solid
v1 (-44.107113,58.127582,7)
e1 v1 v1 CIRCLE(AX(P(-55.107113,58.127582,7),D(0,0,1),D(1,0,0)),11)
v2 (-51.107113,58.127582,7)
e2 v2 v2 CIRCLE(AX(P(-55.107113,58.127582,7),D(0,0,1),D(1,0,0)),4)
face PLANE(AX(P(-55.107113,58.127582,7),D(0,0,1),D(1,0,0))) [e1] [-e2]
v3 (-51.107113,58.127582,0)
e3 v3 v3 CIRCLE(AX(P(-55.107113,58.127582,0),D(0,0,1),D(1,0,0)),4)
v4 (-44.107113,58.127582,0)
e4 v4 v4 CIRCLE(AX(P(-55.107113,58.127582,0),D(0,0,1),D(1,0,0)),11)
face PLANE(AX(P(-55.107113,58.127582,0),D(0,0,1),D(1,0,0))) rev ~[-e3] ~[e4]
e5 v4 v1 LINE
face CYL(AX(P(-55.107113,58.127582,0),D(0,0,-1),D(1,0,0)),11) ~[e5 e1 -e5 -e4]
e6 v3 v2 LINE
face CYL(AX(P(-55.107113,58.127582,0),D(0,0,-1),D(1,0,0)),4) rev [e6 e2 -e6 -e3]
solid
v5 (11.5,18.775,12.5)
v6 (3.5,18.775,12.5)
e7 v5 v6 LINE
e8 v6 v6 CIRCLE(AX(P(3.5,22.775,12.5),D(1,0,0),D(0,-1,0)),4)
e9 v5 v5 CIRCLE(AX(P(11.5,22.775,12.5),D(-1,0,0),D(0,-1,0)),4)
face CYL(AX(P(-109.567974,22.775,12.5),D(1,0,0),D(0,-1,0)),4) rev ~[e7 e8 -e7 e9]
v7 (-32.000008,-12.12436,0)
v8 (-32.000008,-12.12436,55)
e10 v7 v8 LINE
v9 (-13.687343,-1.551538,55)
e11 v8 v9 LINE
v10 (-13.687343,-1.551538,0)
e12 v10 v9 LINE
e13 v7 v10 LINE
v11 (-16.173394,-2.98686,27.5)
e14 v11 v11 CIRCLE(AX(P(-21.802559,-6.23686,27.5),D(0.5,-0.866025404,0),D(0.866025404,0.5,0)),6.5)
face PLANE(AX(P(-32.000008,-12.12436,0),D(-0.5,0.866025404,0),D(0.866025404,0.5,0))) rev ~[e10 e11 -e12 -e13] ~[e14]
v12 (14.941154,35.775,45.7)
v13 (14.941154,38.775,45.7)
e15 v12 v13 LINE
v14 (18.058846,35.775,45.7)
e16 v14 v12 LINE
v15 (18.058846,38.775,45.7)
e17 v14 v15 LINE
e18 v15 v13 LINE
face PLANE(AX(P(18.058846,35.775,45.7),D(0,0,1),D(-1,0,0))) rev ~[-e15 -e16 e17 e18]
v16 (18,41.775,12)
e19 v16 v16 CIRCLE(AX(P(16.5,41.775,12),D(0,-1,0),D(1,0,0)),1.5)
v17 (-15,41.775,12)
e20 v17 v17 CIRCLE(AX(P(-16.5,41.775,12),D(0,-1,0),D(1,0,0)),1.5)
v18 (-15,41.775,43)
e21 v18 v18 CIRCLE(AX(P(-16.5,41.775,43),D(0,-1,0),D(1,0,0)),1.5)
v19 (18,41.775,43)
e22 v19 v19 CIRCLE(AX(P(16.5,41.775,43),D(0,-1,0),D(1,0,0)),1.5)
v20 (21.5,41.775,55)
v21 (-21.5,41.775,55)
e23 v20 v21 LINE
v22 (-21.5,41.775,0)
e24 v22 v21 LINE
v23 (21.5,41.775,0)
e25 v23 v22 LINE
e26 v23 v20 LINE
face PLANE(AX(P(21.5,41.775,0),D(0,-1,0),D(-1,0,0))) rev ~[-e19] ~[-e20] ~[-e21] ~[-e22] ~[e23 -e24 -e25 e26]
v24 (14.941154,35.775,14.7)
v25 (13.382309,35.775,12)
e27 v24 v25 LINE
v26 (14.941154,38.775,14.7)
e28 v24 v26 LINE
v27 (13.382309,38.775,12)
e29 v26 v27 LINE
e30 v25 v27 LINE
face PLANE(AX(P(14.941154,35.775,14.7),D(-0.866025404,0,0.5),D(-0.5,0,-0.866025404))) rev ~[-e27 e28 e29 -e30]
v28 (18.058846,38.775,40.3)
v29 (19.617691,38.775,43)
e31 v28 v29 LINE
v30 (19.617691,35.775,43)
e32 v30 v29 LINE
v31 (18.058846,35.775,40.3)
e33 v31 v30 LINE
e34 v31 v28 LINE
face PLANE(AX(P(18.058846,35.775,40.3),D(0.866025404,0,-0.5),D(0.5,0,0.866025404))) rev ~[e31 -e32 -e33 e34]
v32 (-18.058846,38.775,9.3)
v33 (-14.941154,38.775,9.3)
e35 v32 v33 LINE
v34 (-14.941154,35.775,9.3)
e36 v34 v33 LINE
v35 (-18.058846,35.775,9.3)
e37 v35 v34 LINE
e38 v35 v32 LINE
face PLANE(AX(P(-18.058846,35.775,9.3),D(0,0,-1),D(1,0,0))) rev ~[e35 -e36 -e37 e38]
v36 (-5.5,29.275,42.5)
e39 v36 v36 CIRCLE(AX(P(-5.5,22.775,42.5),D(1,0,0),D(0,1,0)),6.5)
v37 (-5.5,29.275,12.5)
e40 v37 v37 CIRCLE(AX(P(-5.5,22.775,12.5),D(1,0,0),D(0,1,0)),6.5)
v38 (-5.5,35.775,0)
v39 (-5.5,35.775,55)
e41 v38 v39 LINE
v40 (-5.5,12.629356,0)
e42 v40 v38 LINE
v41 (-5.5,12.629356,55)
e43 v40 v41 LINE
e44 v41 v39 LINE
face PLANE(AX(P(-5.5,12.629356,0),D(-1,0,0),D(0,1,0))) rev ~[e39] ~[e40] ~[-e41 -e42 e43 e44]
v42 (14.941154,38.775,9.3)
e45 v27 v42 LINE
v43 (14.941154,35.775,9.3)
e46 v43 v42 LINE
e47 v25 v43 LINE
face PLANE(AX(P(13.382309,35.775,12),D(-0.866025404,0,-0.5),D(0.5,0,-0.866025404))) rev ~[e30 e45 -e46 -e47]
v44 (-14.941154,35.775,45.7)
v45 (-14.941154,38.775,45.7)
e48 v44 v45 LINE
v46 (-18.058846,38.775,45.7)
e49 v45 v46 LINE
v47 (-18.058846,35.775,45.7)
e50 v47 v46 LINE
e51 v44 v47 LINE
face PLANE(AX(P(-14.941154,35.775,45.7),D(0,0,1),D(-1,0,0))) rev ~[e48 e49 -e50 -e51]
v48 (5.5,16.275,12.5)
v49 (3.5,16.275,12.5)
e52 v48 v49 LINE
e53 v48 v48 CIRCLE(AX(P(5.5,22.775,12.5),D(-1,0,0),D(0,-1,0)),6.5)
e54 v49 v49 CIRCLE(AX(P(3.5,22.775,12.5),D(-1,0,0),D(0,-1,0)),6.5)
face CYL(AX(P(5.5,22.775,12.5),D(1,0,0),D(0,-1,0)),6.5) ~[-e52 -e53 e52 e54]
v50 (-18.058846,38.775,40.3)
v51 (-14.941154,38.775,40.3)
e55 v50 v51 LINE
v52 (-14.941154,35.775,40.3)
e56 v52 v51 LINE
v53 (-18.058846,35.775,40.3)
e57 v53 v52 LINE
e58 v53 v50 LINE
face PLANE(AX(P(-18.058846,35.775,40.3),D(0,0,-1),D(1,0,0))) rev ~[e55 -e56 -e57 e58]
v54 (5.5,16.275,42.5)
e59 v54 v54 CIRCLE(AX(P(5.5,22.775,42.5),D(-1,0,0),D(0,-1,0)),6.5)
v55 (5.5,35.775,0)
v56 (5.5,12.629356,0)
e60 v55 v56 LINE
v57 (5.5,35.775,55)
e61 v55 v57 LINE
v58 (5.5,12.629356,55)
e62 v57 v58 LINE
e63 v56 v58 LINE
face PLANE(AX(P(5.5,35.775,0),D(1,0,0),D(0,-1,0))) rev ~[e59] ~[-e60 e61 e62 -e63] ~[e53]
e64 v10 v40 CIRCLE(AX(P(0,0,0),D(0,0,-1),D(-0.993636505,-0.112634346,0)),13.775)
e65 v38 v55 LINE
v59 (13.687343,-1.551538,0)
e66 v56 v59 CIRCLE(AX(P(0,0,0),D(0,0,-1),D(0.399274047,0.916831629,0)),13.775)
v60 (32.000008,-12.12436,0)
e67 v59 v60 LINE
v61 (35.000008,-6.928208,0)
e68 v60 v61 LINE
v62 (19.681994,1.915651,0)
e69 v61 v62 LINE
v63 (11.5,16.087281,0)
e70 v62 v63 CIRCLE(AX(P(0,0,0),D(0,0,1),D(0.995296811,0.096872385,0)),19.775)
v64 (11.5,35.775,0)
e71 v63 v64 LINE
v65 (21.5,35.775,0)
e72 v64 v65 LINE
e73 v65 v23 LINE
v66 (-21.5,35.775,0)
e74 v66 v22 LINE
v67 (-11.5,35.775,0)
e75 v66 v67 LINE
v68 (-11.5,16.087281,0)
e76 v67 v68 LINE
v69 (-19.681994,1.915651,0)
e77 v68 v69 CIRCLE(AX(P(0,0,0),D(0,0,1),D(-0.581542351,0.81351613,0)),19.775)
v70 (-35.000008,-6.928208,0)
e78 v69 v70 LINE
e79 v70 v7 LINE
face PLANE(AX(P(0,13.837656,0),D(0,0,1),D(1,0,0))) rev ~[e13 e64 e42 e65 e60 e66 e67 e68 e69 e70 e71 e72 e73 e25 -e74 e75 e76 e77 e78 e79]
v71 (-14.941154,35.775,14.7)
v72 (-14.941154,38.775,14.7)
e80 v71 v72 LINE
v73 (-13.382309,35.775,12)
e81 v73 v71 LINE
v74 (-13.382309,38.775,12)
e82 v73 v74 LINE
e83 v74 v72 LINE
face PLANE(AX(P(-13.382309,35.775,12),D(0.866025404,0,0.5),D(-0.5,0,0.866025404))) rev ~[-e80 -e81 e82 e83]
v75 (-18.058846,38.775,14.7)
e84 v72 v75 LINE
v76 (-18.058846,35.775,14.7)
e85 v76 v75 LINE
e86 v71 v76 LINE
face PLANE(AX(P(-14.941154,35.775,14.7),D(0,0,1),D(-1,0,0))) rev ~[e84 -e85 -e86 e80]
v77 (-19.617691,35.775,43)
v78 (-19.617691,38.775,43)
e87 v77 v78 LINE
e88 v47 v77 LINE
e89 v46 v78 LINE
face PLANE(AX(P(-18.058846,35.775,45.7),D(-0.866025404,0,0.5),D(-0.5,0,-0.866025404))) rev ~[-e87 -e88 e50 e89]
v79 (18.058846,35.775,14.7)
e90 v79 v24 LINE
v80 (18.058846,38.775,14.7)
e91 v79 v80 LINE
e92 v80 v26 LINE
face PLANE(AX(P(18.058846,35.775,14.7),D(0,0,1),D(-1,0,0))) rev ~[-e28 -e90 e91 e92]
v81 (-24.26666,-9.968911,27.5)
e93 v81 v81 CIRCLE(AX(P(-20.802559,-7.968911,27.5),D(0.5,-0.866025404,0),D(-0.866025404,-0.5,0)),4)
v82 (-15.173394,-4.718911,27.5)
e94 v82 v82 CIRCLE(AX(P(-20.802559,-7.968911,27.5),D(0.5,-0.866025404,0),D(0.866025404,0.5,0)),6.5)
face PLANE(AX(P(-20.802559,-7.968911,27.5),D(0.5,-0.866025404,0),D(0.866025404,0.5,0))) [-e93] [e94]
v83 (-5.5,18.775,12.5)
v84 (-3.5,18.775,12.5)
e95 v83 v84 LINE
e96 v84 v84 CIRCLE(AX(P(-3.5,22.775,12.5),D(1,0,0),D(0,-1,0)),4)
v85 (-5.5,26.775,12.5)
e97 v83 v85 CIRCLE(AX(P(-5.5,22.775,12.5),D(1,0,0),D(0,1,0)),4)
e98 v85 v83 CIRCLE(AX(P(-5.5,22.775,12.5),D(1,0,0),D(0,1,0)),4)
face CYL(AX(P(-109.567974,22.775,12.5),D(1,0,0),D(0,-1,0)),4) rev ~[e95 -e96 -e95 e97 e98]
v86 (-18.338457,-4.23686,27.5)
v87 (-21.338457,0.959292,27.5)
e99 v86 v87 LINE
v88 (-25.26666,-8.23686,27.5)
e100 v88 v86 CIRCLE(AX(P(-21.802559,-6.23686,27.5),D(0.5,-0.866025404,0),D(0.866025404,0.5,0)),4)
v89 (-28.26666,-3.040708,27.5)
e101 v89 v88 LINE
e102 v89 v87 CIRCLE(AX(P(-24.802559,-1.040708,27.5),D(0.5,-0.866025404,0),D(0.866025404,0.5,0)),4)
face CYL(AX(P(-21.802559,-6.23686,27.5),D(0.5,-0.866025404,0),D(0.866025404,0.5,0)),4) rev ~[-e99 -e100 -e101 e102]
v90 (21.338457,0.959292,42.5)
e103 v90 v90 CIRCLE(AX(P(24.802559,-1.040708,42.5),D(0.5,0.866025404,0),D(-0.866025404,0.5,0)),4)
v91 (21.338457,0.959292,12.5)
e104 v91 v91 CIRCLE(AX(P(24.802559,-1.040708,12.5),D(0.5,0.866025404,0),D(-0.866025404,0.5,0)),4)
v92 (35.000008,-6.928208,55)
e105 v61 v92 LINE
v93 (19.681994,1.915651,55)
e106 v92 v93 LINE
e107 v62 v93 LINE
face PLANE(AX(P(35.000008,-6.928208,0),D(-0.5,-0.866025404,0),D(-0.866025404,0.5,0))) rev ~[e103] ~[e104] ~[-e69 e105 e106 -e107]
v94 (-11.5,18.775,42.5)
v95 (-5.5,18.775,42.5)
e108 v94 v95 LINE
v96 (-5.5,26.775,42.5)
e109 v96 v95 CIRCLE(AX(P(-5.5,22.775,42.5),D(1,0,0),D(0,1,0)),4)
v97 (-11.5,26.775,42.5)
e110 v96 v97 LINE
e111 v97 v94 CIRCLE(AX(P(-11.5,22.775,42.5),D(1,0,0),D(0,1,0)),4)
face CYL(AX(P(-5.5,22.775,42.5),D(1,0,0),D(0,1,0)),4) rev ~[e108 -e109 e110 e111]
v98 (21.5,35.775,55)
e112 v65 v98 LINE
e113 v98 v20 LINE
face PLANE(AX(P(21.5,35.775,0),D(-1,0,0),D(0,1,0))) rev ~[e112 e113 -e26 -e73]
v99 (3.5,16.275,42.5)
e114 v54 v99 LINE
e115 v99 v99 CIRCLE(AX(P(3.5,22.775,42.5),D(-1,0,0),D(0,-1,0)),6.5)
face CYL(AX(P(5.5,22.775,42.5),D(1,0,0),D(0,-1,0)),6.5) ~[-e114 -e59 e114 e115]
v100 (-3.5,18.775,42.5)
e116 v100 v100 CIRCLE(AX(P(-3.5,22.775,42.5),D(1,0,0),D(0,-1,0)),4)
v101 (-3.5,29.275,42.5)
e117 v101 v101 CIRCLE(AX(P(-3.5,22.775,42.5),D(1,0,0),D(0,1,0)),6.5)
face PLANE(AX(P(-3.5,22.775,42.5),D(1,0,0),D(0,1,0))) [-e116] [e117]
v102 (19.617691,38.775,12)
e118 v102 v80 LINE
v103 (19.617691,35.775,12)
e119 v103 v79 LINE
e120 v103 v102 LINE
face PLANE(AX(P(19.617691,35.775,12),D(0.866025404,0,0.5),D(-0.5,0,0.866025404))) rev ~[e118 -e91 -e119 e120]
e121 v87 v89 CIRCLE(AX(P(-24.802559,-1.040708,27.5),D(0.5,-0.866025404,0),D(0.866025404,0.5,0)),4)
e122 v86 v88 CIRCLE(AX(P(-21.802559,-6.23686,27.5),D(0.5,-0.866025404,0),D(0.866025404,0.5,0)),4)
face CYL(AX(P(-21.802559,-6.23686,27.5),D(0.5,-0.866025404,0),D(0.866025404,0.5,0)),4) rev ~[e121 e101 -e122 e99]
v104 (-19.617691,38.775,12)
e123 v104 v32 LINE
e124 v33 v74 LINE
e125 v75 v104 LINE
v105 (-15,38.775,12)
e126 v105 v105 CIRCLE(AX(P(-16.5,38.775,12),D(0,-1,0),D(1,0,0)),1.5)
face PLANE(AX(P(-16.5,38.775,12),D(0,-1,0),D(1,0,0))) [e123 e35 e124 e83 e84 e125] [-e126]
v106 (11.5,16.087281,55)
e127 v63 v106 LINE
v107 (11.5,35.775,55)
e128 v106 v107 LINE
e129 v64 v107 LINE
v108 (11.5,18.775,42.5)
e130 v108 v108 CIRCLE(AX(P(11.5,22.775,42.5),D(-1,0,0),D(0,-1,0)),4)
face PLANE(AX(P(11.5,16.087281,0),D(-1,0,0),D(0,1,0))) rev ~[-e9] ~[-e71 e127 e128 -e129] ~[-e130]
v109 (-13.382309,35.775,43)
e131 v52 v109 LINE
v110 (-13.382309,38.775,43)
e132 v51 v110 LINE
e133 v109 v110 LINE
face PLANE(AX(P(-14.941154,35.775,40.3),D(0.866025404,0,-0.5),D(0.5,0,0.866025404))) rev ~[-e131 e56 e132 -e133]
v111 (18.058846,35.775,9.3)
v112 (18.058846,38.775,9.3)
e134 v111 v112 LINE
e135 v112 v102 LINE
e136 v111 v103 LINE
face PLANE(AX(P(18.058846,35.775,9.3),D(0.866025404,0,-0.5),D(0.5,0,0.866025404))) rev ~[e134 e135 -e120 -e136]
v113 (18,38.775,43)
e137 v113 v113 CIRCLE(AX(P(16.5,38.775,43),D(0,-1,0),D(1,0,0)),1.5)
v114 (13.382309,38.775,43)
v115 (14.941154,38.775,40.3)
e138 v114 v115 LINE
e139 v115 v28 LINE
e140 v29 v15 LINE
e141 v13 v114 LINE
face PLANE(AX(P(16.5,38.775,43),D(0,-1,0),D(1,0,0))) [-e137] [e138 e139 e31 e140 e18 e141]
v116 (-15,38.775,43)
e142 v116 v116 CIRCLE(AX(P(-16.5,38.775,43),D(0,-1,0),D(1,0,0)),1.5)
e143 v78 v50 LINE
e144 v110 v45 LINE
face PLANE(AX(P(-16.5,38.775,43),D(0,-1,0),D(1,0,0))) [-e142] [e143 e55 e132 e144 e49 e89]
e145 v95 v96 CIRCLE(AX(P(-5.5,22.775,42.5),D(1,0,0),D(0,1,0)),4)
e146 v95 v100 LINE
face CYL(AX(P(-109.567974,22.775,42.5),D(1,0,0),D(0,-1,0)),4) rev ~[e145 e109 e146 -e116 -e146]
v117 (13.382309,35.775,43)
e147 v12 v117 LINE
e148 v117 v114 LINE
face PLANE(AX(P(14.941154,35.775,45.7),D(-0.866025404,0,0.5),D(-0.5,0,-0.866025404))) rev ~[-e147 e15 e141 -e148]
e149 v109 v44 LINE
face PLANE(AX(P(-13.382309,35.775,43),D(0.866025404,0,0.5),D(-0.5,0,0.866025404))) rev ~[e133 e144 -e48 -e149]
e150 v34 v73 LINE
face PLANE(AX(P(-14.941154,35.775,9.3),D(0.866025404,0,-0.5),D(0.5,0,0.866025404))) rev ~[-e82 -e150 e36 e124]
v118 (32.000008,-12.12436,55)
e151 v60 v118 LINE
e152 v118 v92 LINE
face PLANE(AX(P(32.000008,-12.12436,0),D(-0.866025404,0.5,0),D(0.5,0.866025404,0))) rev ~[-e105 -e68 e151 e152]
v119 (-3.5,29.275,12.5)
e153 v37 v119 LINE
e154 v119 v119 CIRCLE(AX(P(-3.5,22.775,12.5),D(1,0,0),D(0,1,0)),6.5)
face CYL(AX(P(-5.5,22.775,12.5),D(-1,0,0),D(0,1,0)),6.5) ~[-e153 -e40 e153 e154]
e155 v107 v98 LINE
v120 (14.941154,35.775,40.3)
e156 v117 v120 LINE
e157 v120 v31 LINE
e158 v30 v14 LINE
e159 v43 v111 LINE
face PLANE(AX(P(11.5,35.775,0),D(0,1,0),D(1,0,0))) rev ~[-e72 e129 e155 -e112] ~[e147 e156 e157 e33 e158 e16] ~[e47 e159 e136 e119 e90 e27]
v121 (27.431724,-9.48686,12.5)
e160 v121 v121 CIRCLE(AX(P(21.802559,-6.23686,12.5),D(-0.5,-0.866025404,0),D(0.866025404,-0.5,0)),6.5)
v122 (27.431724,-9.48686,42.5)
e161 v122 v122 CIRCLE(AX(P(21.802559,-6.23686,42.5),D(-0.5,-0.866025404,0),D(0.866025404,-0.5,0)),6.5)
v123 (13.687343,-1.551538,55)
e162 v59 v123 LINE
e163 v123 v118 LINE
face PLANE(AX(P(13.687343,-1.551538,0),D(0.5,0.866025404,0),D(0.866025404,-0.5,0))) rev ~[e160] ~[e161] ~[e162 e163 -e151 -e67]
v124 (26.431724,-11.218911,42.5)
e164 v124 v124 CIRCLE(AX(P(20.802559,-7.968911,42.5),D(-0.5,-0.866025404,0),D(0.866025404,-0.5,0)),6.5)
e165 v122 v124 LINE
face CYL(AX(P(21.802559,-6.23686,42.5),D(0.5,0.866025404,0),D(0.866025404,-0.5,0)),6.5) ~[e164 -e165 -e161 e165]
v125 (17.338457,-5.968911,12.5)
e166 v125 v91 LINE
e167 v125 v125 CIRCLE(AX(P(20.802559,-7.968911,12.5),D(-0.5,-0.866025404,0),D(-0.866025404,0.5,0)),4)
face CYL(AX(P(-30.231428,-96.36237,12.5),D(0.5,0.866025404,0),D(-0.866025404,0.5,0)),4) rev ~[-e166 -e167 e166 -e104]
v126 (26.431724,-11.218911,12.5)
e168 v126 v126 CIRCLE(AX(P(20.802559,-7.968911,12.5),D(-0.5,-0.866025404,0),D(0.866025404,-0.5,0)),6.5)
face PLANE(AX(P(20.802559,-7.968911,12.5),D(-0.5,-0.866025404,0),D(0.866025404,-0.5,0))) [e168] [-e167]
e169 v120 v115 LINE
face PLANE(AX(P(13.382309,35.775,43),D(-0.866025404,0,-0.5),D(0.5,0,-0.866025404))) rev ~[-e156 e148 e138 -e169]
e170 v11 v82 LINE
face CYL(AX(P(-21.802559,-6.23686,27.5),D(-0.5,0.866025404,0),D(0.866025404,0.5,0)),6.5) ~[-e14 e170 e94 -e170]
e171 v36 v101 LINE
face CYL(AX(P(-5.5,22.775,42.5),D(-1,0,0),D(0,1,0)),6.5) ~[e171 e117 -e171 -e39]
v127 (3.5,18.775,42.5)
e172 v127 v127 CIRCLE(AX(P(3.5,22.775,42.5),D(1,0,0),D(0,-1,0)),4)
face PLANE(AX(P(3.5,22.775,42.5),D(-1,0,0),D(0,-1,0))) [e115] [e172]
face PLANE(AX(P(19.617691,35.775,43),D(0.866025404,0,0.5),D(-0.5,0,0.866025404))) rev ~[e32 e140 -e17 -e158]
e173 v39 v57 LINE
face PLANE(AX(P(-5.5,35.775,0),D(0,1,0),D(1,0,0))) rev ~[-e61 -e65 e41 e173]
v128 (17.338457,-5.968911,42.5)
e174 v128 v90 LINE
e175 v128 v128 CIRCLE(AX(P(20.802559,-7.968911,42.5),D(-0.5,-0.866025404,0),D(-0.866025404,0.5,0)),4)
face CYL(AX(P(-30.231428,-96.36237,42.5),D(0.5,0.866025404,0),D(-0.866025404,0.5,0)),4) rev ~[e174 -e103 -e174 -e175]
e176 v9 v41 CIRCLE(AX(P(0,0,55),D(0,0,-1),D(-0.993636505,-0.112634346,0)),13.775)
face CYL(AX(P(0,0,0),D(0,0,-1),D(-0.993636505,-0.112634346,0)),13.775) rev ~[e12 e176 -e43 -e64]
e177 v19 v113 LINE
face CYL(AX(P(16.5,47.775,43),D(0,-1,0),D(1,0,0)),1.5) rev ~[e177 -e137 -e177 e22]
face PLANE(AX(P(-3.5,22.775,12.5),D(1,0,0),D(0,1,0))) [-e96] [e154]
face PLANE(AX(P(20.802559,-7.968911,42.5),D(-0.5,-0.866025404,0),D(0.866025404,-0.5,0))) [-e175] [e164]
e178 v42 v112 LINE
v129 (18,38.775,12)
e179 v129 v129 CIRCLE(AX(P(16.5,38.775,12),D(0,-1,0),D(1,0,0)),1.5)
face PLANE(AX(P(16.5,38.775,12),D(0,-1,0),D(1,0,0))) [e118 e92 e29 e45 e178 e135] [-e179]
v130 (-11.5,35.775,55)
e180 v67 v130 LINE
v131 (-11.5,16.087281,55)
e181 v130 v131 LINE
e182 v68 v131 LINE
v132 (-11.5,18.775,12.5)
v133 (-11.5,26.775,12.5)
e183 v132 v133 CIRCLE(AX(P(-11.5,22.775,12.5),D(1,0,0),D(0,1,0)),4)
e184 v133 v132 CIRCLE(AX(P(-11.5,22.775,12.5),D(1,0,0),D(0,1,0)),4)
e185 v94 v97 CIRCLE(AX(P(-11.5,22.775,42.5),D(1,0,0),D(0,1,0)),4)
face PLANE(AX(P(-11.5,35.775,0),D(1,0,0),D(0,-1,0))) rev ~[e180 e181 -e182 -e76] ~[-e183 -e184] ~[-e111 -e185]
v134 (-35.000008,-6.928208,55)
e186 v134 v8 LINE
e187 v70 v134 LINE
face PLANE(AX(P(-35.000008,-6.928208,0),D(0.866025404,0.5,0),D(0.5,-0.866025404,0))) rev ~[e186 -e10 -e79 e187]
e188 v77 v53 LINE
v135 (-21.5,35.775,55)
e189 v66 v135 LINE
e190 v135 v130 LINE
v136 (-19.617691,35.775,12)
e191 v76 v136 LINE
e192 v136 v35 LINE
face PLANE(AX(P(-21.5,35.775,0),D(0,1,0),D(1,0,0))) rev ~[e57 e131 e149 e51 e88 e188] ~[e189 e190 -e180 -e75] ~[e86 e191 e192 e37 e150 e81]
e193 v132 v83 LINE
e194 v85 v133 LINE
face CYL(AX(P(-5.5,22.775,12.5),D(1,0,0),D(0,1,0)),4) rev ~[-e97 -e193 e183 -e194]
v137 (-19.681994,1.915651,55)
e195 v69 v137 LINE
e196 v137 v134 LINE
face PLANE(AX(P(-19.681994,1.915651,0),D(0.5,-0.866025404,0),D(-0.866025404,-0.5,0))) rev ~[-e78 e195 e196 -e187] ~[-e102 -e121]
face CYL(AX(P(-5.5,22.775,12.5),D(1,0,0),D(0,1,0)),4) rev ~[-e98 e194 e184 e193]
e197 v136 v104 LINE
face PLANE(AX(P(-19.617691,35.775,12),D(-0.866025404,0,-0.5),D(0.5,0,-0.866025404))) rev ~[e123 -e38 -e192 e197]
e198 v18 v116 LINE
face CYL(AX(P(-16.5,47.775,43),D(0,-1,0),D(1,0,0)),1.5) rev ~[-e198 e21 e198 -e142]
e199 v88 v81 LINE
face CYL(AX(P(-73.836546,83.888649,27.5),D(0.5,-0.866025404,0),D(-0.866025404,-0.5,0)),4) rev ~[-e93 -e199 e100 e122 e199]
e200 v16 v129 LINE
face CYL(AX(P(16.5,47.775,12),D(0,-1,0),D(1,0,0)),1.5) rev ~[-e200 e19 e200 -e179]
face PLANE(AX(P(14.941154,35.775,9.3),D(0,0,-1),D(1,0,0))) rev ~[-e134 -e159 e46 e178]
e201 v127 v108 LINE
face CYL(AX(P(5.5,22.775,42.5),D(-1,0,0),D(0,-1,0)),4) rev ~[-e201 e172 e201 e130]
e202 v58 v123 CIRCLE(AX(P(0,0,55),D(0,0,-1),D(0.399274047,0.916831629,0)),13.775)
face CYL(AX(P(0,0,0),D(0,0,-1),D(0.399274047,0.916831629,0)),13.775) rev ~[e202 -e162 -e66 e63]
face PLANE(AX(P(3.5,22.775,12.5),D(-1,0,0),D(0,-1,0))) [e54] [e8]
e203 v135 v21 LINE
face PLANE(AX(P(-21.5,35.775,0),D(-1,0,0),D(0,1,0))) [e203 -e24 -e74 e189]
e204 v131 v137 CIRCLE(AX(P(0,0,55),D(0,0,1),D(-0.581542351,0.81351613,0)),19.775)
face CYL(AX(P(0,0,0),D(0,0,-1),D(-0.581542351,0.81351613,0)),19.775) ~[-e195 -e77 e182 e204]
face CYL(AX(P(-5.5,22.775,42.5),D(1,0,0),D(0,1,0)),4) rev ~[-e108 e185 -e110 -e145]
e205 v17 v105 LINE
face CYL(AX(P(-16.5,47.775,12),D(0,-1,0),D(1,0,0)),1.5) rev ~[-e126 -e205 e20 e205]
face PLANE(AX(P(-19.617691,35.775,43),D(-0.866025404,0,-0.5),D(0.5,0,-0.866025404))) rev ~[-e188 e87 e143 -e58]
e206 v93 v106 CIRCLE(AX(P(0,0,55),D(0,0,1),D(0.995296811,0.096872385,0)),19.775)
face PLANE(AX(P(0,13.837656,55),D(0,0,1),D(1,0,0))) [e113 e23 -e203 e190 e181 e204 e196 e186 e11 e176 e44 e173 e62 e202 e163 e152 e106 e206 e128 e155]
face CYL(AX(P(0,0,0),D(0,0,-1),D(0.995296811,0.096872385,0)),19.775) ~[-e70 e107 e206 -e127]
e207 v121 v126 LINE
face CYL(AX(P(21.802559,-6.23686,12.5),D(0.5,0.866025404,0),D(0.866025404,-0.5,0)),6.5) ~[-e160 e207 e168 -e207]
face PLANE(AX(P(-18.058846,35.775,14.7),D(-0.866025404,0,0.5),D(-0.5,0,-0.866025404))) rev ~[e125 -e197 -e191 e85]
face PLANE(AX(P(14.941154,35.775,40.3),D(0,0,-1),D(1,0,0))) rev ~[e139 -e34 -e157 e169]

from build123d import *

# Parameters (mm, degrees)
F8_W             = 10
F8_H             = 6
F9_DEPTH         = 55
F10_R            = 11
F10_R_2          = 4
F11_DEPTH        = 7
F12_R            = 6.5
F16_DEPTH        = 2
F17_D            = 8
F17_ON_F12_D     = 8
F17_ON_F12_DEPTH = 48.1792152495
F17_ON_F14_D     = 8
F17_ON_F14_DEPTH = 29.5010080128
F17_ON_F15_D     = 8
F17_ON_F15_DEPTH = 29.5010080128
F13_R            = 6.5
F18_DEPTH        = 2
F15_R            = 6.5
F19_DEPTH        = 2
F14_R            = 6.5
F20_DEPTH        = 2
F21_D            = 8
F21_ON_F15_D     = 8
F21_ON_F13_D     = 8
F23_D            = 3
F23_DEPTH        = 6
F23_TIP          = 0.9012909285
F24_R            = 1.5
F25_DEPTH        = 3


# Not quite as in the source:
# - a feature names something its author has since deleted; it is built from what else it names


with BuildPart() as f9:
    # F8 (on Top) → F9 (new body)
    with BuildSketch(Plane.XY):
        with BuildLine():
            ThreePointArc((-13.687342856, -1.5515381213), (-11.9294999371, 6.8875), (-5.5, 12.6293556843))
            Line((-5.5, 12.6293556843), (-5.5, 35.775))
            Line((-5.5, 35.775), (5.5, 35.775))
            Line((5.5, 35.775), (5.5, 12.6293556843))
            ThreePointArc((5.5, 12.6293556843), (11.9294999371, 6.8875), (13.687342856, -1.5515381213))
            Line((13.687342856, -1.5515381213), (32.0000080128, -12.1243602792))
            Line((32.0000080128, -12.1243602792), (35.0000080128, -6.9282078565))
            Line((35.0000080128, -6.9282078565), (19.6819944283, 1.91565141))
            ThreePointArc((19.6819944283, 1.91565141), (17.1256523598, 9.8875), (11.5, 16.087281467))
            Line((11.5, 16.087281467), (11.5, 35.775))
            Line((11.5, 35.775), (11.5, 41.775))
            Line((11.5, 41.775), (-11.5, 41.775))
            Line((-11.5, 41.775), (-11.5, 35.775))
            Line((-11.5, 35.775), (-11.5, 16.087281467))
            ThreePointArc((-11.5, 16.087281467), (-17.1256523598, 9.8875), (-19.6819944283, 1.91565141))
            Line((-19.6819944283, 1.91565141), (-35.0000080128, -6.9282078565))
            Line((-35.0000080128, -6.9282078565), (-32.0000080128, -12.1243602792))
            Line((-32.0000080128, -12.1243602792), (-13.687342856, -1.5515381213))
        make_face()
        with Locations((-16.5, 38.775)):
            Rectangle(F8_W, F8_H)
        with Locations((16.5, 38.775)):
            Rectangle(F8_W, F8_H)
    extrude(amount=F9_DEPTH)

    # F12 (on face) → F16 (join)
    with BuildSketch(Plane(origin=(-2.75, 4.7631397208, 0), x_dir=(0.8660254038, 0.5, 0), z_dir=(0.5, -0.8660254038, 0))):
        with Locations((-22, 27.5)):
            Circle(F12_R)
    extrude(amount=F16_DEPTH)

    # F17 (through all)
    with Locations(Plane(origin=(2.75, 4.7631397208, 0), x_dir=(0.8660254038, -0.5, 0), z_dir=(-0.5, -0.8660254038, 0))):
        with Locations((22, 42.5), (22, 12.5)):
            Hole(F17_D / 2)

    # F17 on F12 (through all, one way)
    with BuildSketch(Plane(origin=(-2.75, 4.7631397208, 0), x_dir=(0.8660254038, 0.5, 0), z_dir=(0.5, -0.8660254038, 0))):
        with Locations((-22, 27.5)):
            Circle(F17_ON_F12_D / 2)
    extrude(amount=-F17_ON_F12_DEPTH, mode=Mode.SUBTRACT)

    # F17 on F14 (through all, one way)
    with BuildSketch(Plane(origin=(5.5, 0, 0), x_dir=(0, -1, 0), z_dir=(-1, 0, 0))):
        with Locations((-22.775, 42.5), (-22.775, 12.5)):
            Circle(F17_ON_F14_D / 2)
    extrude(amount=-F17_ON_F14_DEPTH, mode=Mode.SUBTRACT)

    # F17 on F15 (through all, one way)
    with BuildSketch(Plane.YZ.offset(-5.5)):
        with Locations((22.775, 42.5), (22.775, 12.5)):
            Circle(F17_ON_F15_D / 2)
    extrude(amount=-F17_ON_F15_DEPTH, mode=Mode.SUBTRACT)

    # F13 (on face) → F18 (join)
    with BuildSketch(Plane(origin=(2.75, 4.7631397208, 0), x_dir=(0.8660254038, -0.5, 0), z_dir=(-0.5, -0.8660254038, 0))):
        with Locations((22, 12.5)):
            Circle(F13_R)
        with Locations((22, 42.5)):
            Circle(F13_R)
    extrude(amount=F18_DEPTH)

    # F15 (on face) → F19 (join)
    with BuildSketch(Plane.YZ.offset(-5.5)):
        with Locations((22.775, 12.5)):
            Circle(F15_R)
        with Locations((22.775, 42.5)):
            Circle(F15_R)
    extrude(amount=F19_DEPTH)

    # F14 (on face) → F20 (join)
    with BuildSketch(Plane(origin=(5.5, 0, 0), x_dir=(0, -1, 0), z_dir=(-1, 0, 0))):
        with Locations((-22.775, 12.5)):
            Circle(F14_R)
        with Locations((-22.775, 42.5)):
            Circle(F14_R)
    extrude(amount=F20_DEPTH)

    # F21 (through all)
    with Locations(Plane(origin=(-2.75, 4.7631397208, 0), x_dir=(0.8660254038, 0.5, 0), z_dir=(-0.5, 0.8660254038, 0))):
        with Locations((-22, -27.5)):
            Hole(F21_D / 2)

    # F21 on F15 (through all)
    with Locations(Plane(origin=(-5.5, 0, 0), x_dir=(0, 1, 0), z_dir=(-1, 0, 0))):
        with Locations((22.775, -42.5), (22.775, -12.5)):
            Hole(F21_ON_F15_D / 2)

    # F21 on F13 (through all)
    with Locations(Plane(origin=(2.75, 4.7631397208, 0), x_dir=(0.8660254038, -0.5, 0), z_dir=(0.5, 0.8660254038, 0))):
        with Locations((22, -42.5), (22, -12.5)):
            Hole(F21_ON_F13_D / 2)

    # F23
    with Locations(Plane(origin=(0, 41.775, 0), x_dir=(-1, 0, 0), z_dir=(0, 1, 0))):
        with Locations((16.5, 12), (-16.5, 12), (-16.5, 43), (16.5, 43)):
            Hole(F23_D / 2, depth=F23_DEPTH)
            with Locations((0, 0, -(F23_DEPTH + F23_TIP / 2))):  # 118° drill point
                Cone(0, F23_D / 2, F23_TIP, mode=Mode.SUBTRACT)

    # F24 (on face) → F25 (cut)
    with BuildSketch(Plane.XZ.offset(-35.775)):
        Polygon((-18.0588457268, 9.3), (-14.9411542732, 9.3), (-13.3823085464, 12), (-14.9411542732, 14.7), (-18.0588457268, 14.7), (-19.6176914536, 12), align=None)
        Polygon((-14.9411542732, 45.7), (-18.0588457268, 45.7), (-19.6176914536, 43), (-18.0588457268, 40.3), (-14.9411542732, 40.3), (-13.3823085464, 43), align=None)
        Polygon((18.0588457268, 14.7), (14.9411542732, 14.7), (13.3823085464, 12), (14.9411542732, 9.3), (18.0588457268, 9.3), (19.6176914536, 12), align=None)
        with Locations((16.5, 12)):
            Circle(F24_R, mode=Mode.SUBTRACT)
        Polygon((18.0588457268, 45.7), (14.9411542732, 45.7), (13.3823085464, 43), (14.9411542732, 40.3), (18.0588457268, 40.3), (19.6176914536, 43), align=None)
        with Locations((16.5, 43)):
            Circle(F24_R, mode=Mode.SUBTRACT)
    extrude(amount=-F25_DEPTH, mode=Mode.SUBTRACT)


with BuildPart() as f11:
    # F10 (on Top) → F11 (new body)
    with BuildSketch(Plane.XY):
        with Locations((-55.1071129739, 58.1275820732)):
            Circle(F10_R)
        with Locations((-55.1071129739, 58.1275820732)):
            Circle(F10_R_2, mode=Mode.SUBTRACT)
    extrude(amount=F11_DEPTH)


solid = Compound([f9.part, f11.part])
